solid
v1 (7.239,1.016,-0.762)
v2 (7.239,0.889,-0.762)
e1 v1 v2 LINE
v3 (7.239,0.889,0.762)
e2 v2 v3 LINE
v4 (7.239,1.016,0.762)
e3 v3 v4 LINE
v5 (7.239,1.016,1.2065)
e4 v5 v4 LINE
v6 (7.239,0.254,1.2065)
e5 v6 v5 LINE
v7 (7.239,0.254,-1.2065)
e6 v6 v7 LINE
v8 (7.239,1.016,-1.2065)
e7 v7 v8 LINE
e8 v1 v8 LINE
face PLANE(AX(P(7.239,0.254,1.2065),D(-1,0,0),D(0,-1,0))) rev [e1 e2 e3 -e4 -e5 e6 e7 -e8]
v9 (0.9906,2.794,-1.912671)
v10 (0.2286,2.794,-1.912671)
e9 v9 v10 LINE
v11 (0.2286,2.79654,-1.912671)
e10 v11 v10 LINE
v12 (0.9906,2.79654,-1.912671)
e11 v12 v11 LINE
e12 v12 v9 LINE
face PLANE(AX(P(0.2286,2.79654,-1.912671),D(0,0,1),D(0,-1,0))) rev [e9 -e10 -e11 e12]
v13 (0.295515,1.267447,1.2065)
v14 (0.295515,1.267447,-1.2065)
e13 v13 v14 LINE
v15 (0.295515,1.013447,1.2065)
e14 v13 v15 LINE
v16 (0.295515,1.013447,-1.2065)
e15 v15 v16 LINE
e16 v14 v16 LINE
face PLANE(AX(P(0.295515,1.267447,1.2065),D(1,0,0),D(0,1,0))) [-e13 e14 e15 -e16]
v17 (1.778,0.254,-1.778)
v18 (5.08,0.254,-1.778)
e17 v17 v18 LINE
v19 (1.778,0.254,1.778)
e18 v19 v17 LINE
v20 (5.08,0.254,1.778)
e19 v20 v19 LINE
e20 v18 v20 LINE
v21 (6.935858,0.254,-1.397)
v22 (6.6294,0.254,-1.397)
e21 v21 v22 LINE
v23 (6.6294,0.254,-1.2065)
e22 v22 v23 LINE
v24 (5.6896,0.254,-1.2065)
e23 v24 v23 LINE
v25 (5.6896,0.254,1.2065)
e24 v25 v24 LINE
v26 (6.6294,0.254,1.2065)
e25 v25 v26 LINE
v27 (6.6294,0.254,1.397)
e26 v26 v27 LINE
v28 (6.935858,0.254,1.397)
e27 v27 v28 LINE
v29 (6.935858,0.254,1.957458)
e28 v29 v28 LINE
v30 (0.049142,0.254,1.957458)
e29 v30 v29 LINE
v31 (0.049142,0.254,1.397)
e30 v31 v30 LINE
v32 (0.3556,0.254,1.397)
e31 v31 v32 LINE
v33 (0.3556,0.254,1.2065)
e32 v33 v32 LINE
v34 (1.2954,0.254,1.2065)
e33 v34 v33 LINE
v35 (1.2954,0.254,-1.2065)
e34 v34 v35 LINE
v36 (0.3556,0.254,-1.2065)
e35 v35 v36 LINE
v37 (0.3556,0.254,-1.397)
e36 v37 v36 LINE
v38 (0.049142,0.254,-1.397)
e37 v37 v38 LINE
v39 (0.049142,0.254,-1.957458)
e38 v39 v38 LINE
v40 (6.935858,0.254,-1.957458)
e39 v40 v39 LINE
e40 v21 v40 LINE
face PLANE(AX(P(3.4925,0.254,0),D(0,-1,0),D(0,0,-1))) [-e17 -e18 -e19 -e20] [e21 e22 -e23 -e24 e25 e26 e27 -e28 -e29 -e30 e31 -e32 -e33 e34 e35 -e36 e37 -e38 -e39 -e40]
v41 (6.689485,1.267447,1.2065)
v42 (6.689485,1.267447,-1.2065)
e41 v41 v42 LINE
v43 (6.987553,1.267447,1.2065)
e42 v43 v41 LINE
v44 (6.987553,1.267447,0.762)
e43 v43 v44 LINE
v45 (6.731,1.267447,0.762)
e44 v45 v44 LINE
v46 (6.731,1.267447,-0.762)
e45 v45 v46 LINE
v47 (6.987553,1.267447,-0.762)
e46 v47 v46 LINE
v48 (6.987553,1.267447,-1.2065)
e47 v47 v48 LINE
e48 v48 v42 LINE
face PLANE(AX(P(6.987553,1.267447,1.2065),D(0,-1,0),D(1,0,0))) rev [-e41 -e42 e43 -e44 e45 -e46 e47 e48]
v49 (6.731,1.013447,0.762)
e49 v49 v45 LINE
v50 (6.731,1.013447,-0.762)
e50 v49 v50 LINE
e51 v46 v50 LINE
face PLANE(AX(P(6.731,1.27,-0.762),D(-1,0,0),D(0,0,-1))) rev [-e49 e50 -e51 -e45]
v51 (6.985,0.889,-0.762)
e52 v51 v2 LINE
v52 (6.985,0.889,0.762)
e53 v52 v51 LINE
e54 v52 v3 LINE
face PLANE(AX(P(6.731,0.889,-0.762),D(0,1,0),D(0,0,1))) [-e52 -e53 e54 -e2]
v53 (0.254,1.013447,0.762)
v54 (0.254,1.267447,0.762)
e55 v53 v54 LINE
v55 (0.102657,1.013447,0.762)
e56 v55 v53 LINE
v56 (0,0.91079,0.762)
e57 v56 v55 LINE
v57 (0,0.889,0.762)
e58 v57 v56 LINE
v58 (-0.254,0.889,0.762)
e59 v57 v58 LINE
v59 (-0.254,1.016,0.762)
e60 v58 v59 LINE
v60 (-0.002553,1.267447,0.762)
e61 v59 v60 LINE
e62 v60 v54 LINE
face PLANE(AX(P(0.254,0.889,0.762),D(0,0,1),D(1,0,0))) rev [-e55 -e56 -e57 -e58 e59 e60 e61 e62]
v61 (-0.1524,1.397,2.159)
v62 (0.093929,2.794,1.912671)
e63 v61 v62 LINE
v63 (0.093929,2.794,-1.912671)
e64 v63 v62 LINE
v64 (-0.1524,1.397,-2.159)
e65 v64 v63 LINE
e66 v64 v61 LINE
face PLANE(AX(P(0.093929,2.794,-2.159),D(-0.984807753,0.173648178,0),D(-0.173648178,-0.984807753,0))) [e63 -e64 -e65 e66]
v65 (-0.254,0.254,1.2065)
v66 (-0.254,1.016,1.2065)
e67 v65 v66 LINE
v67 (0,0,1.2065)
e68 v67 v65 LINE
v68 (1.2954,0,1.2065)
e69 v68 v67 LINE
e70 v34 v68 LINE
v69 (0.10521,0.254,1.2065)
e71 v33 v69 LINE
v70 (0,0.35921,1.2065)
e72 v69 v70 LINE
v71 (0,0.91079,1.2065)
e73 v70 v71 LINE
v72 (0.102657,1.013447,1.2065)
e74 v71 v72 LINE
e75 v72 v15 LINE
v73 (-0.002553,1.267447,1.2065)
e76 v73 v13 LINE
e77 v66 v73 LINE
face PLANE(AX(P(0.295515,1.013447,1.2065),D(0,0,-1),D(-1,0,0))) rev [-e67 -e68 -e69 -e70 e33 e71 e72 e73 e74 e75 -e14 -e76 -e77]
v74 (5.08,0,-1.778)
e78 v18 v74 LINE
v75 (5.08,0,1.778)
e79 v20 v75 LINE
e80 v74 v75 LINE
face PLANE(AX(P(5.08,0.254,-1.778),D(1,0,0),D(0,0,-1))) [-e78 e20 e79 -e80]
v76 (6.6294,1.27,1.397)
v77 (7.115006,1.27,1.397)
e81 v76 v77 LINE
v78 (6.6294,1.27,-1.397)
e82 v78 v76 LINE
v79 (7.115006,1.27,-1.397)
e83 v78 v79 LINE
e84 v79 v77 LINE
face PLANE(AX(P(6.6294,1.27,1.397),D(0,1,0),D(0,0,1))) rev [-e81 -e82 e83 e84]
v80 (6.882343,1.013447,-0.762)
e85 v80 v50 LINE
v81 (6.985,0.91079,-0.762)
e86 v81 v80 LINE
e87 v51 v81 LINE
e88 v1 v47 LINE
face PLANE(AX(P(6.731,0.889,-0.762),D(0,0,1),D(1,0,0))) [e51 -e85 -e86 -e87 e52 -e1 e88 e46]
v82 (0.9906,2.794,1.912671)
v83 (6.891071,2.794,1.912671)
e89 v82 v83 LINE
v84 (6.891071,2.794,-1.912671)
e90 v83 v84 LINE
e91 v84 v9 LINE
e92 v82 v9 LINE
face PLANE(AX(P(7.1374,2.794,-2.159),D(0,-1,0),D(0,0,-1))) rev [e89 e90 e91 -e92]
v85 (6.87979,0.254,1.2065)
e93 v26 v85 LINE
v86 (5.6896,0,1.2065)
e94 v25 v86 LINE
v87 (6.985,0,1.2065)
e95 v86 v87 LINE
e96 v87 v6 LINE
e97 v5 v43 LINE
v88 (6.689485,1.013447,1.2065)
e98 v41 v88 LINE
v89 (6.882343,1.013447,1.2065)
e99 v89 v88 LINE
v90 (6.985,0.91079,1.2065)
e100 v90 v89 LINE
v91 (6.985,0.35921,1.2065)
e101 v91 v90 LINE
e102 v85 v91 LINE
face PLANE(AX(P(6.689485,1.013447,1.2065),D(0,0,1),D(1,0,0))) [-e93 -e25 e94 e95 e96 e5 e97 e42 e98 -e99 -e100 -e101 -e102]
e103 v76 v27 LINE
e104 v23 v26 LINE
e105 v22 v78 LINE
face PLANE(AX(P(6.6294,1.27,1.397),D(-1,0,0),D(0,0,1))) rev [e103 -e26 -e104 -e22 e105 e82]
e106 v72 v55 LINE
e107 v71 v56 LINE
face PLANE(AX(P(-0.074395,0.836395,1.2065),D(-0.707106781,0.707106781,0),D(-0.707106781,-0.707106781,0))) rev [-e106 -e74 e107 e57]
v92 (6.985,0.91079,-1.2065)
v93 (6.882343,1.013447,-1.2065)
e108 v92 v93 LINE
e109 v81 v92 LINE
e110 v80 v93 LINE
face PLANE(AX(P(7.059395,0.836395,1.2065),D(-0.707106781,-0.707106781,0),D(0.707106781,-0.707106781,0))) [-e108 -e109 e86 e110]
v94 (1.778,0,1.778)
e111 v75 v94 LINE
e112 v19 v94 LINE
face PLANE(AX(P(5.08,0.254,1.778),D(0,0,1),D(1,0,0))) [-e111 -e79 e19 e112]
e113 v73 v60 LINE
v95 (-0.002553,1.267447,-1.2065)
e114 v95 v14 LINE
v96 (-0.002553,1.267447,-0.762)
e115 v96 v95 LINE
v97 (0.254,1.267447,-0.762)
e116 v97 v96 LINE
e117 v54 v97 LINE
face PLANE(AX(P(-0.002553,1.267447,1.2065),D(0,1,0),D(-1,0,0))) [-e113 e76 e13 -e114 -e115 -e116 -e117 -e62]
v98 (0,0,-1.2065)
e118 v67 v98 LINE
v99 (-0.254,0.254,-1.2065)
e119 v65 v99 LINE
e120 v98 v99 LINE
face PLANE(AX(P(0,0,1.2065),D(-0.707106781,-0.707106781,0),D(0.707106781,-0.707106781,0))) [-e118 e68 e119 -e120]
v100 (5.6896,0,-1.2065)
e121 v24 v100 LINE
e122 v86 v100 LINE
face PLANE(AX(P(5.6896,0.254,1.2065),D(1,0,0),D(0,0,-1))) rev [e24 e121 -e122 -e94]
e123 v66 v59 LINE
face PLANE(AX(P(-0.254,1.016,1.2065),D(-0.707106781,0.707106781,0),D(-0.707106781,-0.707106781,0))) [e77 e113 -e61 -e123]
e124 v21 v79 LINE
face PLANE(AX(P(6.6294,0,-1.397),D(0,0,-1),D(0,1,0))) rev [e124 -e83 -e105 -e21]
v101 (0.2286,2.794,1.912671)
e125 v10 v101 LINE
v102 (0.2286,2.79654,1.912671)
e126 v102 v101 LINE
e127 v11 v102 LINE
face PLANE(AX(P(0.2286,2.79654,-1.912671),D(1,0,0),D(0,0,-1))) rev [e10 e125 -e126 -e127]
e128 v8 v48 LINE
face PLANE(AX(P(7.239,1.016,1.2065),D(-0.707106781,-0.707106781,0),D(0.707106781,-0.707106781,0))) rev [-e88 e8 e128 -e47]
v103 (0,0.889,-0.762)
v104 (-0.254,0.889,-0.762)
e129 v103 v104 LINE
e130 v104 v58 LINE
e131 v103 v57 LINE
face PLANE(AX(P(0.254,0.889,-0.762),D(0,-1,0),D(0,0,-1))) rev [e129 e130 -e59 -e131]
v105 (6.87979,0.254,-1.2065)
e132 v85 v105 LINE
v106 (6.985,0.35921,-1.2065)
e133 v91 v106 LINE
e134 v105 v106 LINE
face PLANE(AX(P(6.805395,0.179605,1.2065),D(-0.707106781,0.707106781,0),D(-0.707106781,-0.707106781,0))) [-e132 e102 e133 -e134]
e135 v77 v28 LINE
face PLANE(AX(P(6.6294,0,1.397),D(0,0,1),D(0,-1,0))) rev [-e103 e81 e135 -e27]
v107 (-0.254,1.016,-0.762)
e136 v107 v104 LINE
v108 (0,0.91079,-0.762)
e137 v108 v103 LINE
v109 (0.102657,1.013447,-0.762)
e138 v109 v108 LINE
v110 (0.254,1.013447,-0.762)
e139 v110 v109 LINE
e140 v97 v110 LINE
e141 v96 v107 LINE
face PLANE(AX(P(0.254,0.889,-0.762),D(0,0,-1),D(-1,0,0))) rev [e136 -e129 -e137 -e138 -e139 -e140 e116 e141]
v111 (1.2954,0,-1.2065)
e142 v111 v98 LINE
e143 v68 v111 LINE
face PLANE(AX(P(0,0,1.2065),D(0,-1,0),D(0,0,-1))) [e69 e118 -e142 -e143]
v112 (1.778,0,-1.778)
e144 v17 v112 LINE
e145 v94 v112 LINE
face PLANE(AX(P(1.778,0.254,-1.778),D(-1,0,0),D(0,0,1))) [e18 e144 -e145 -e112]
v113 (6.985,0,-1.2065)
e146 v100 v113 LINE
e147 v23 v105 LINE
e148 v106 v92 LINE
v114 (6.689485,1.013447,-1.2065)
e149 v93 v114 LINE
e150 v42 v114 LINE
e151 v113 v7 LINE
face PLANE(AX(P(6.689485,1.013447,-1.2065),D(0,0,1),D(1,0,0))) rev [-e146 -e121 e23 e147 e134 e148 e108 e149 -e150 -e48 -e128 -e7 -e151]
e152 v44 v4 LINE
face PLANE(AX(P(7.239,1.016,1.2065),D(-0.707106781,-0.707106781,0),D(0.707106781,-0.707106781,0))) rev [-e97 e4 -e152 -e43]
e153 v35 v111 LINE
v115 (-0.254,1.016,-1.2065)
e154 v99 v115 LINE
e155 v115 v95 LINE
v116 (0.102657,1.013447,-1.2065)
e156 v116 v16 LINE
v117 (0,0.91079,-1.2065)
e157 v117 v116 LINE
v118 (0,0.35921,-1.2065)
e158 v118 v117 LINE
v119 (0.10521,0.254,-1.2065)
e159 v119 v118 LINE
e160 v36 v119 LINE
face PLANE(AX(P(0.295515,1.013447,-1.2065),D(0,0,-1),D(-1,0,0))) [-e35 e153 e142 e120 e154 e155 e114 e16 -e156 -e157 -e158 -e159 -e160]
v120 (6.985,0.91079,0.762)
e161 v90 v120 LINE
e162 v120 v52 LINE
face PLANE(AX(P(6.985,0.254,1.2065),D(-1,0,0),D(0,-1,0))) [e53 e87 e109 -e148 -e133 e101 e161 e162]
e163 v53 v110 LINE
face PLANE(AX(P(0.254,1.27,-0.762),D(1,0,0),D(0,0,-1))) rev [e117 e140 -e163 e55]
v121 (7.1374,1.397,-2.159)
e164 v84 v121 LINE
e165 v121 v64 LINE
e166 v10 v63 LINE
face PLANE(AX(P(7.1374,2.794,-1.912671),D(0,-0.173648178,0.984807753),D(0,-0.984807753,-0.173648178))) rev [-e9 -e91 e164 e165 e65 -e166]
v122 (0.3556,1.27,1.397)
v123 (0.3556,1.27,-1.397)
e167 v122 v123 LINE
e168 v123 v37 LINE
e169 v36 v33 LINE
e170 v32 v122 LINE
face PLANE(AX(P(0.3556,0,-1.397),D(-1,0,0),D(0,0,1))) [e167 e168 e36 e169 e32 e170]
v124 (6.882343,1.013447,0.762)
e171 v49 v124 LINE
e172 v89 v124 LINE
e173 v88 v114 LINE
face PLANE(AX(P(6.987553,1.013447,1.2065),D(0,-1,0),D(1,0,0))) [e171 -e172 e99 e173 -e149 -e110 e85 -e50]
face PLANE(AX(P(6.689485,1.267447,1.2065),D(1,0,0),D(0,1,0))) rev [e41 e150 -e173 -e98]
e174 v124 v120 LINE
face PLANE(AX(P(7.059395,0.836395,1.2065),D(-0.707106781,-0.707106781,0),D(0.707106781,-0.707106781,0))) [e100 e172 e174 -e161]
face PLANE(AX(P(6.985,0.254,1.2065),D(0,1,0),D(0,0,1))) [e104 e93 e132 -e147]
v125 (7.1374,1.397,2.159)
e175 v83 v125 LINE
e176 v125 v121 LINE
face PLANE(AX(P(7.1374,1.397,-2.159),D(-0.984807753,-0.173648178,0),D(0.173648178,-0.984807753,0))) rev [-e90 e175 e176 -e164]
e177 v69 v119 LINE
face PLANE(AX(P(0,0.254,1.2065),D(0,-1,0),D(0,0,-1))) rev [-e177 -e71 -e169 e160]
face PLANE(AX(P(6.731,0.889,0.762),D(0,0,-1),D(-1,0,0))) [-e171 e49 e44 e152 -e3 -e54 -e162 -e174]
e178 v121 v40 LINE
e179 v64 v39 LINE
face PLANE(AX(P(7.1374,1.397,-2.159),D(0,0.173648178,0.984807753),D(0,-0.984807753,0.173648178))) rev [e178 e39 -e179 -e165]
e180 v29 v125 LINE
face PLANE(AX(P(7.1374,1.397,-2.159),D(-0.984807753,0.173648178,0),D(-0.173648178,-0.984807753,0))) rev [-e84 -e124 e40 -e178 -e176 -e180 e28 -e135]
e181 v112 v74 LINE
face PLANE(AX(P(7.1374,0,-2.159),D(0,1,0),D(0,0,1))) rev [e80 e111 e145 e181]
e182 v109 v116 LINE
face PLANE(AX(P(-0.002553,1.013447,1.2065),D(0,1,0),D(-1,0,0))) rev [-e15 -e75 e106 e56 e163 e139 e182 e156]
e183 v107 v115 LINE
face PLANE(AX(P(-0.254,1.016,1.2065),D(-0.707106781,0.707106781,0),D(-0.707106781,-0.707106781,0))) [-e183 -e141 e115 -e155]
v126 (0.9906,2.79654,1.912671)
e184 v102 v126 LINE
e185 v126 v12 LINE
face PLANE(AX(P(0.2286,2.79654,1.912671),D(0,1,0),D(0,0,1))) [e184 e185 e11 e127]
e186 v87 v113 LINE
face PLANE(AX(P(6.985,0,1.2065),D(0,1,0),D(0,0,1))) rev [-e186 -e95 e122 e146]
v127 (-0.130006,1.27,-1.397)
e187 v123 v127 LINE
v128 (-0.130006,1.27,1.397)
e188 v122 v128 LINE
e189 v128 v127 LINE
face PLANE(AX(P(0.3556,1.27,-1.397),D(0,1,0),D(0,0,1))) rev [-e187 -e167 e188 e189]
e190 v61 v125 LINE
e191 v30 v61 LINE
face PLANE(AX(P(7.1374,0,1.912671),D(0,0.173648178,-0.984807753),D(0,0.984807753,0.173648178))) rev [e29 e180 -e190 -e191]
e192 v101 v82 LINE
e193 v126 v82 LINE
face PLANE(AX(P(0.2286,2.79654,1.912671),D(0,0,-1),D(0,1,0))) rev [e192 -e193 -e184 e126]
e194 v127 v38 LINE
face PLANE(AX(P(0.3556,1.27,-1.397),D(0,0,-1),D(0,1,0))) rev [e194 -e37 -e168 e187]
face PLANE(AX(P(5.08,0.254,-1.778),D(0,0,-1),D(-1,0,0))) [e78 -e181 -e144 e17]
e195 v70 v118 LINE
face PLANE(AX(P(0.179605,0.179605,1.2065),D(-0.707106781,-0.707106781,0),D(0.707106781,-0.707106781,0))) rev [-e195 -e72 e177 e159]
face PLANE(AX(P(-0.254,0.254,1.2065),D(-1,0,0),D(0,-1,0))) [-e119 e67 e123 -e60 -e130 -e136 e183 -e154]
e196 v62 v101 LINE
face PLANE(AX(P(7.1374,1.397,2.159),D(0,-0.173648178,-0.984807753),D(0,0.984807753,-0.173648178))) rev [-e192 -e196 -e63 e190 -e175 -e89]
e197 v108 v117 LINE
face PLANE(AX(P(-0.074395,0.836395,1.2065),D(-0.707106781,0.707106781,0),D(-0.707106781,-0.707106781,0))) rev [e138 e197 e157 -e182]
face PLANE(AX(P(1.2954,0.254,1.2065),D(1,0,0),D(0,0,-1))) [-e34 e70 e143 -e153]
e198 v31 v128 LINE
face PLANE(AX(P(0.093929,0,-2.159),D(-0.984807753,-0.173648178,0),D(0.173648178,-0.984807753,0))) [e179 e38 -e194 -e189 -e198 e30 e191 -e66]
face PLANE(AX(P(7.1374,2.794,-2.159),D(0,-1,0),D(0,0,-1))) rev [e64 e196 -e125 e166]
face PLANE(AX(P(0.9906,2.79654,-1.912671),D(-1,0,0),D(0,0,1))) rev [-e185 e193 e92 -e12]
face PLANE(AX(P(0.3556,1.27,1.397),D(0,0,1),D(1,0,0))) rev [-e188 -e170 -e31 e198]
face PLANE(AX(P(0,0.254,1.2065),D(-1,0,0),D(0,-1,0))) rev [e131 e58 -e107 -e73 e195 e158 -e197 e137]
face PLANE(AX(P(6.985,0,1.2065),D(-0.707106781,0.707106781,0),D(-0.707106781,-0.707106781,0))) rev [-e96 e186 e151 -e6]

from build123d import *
from OCP.BRepFilletAPI import BRepFilletAPI_MakeChamfer

# Parameters (mm, degrees)
SKETCH2_W                = 4.318
SKETCH2_H                = 2.794
BASE_EXTRUDE_DEPTH       = 7.2898
CHAMFER1_SIZE            = 1.397
CHAMFER1_SIZE2           = 0.246328792
SKETCH3_W                = 2.794
SKETCH3_H                = 1.27
CUT_EXTRUDE1_DEPTH       = 0.508
SKETCH4_W                = 2.794
SKETCH4_H                = 1.27
CUT_EXTRUDE2_DEPTH       = 0.508
SKETCH5_OUTSIDE_W        = 11.073
SKETCH5_OUTSIDE_H        = 8.102
SKETCH5_OUTSIDE_W_2      = 3.302
SKETCH5_OUTSIDE_H_2      = 3.556
CUT_EXTRUDE3_DEPTH       = 0.254
CHAMFER2_SIZE            = 1.397
CHAMFER2_SIZE_2          = 0.246328792
BOSS_EXTRUDE_THIN1_DEPTH = 1.2065
SKETCH7_W                = 1.524
SKETCH7_H                = 0.381
CUT_EXTRUDE4_DEPTH       = 0.508
SKETCH8_W                = 0.762
SKETCH8_H                = 3.825342416
BOSS_EXTRUDE2_DEPTH      = 0.00254


with BuildPart() as part:
    # Sketch2 → Base-Extrude (new body)
    with BuildSketch(Plane(origin=(-0.1524, 0, 0), x_dir=(0, 0, -1), z_dir=(1, 0, 0))):
        with Locations((0, 1.397)):
            Rectangle(SKETCH2_W, SKETCH2_H)
    extrude(amount=BASE_EXTRUDE_DEPTH)

    # Chamfer1: one chamfer whose edges measure the first distance from different faces: ONE call of the kernel's chamfer builder (chamfer() names one face for all edges)
    chamfer1_edges_1 = [part.edges().sort_by_distance(p)[0] for p in [
        (7.1374, 0, 0),
    ]]
    chamfer1_side_1 = [part.faces().sort_by_distance(p)[0] for p in [
        (7.1374, 1.397, 0),
    ]]
    chamfer1_edges_2 = [part.edges().sort_by_distance(p)[0] for p in [
        (-0.1524, 0, 0),
    ]]
    chamfer1_side_2 = [part.faces().sort_by_distance(p)[0] for p in [
        (-0.1524, 1.397, 0),
    ]]
    chamfer1_edges_3 = [part.edges().sort_by_distance(p)[0] for p in [
        (3.4925, 0, -2.159),
    ]]
    chamfer1_side_3 = [part.faces().sort_by_distance(p)[0] for p in [
        (3.4925, 1.397, -2.159),
    ]]
    chamfer1_edges_4 = [part.edges().sort_by_distance(p)[0] for p in [
        (3.4925, 0, 2.159),
    ]]
    chamfer1_side_4 = [part.faces().sort_by_distance(p)[0] for p in [
        (3.4925, 1.397, 2.159),
    ]]
    chamfer1 = BRepFilletAPI_MakeChamfer(part.part.solid().wrapped)
    for e in chamfer1_edges_1:
        chamfer1.Add(CHAMFER1_SIZE, CHAMFER1_SIZE2, e.wrapped, chamfer1_side_1[0].wrapped)  # the first distance lies on this face
    for e in chamfer1_edges_2:
        chamfer1.Add(CHAMFER1_SIZE, CHAMFER1_SIZE2, e.wrapped, chamfer1_side_2[0].wrapped)  # the first distance lies on this face
    for e in chamfer1_edges_3:
        chamfer1.Add(CHAMFER1_SIZE, CHAMFER1_SIZE2, e.wrapped, chamfer1_side_3[0].wrapped)  # the first distance lies on this face
    for e in chamfer1_edges_4:
        chamfer1.Add(CHAMFER1_SIZE, CHAMFER1_SIZE2, e.wrapped, chamfer1_side_4[0].wrapped)  # the first distance lies on this face
    add(Compound.cast(chamfer1.Shape()), mode=Mode.REPLACE)

    # Sketch3 → Cut-Extrude1 (cut)
    with BuildSketch(Plane.ZY.offset(0.1524)):
        with Locations((0, 0.635)):
            Rectangle(SKETCH3_W, SKETCH3_H)
    extrude(amount=-CUT_EXTRUDE1_DEPTH, mode=Mode.SUBTRACT)

    # Sketch4 → Cut-Extrude2 (cut)
    with BuildSketch(Plane(origin=(7.1374, 0, 0), x_dir=(0, 0, -1), z_dir=(1, 0, 0))):
        with Locations((0, 0.635)):
            Rectangle(SKETCH4_W, SKETCH4_H)
    extrude(amount=-CUT_EXTRUDE2_DEPTH, mode=Mode.SUBTRACT)

    # Sketch5 outside → Cut-Extrude3 (cut)
    with BuildSketch(Plane.XZ):
        with Locations((3.4925, 0)):
            Rectangle(SKETCH5_OUTSIDE_W, SKETCH5_OUTSIDE_H)
        with Locations((3.429, 0)):
            Rectangle(SKETCH5_OUTSIDE_W_2, SKETCH5_OUTSIDE_H_2, mode=Mode.SUBTRACT)
    extrude(amount=-CUT_EXTRUDE3_DEPTH, mode=Mode.SUBTRACT)

    # Chamfer2
    chamfer2_edges_1 = [part.edges().sort_by_distance(p)[0] for p in [
        (-0.1524, 2.794, 0),
    ]]
    chamfer2_side_1 = [part.faces().sort_by_distance(p)[0] for p in [
        (-0.1524, 2.789073424, 0),
    ]]
    chamfer2_edges_2 = [part.edges().sort_by_distance(p)[0] for p in [
        (7.1374, 2.794, 0),
    ]]
    chamfer2_side_2 = [part.faces().sort_by_distance(p)[0] for p in [
        (7.132473424, 2.794, 0),
    ]]
    chamfer2_edges_3 = [part.edges().sort_by_distance(p)[0] for p in [
        (3.4925, 2.794, 2.159),
    ]]
    chamfer2_side_3 = [part.faces().sort_by_distance(p)[0] for p in [
        (3.4925, 2.789073424, 2.159),
    ]]
    chamfer2_edges_4 = [part.edges().sort_by_distance(p)[0] for p in [
        (3.4925, 2.794, -2.159),
    ]]
    chamfer2_side_4 = [part.faces().sort_by_distance(p)[0] for p in [
        (3.4925, 2.794, -2.154073424),
    ]]
    chamfer2 = BRepFilletAPI_MakeChamfer(part.part.solid().wrapped)
    for e in chamfer2_edges_1:
        chamfer2.Add(CHAMFER2_SIZE - 0.0001, CHAMFER2_SIZE_2 - 0.0001, e.wrapped, chamfer2_side_1[0].wrapped)
    for e in chamfer2_edges_2:
        chamfer2.Add(CHAMFER2_SIZE_2 - 0.0001, CHAMFER2_SIZE - 0.0001, e.wrapped, chamfer2_side_2[0].wrapped)
    for e in chamfer2_edges_3:
        chamfer2.Add(CHAMFER2_SIZE - 0.0001, CHAMFER2_SIZE_2 - 0.0001, e.wrapped, chamfer2_side_3[0].wrapped)
    for e in chamfer2_edges_4:
        chamfer2.Add(CHAMFER2_SIZE_2 - 0.0001, CHAMFER2_SIZE - 0.0001, e.wrapped, chamfer2_side_4[0].wrapped)
    add(Compound.cast(chamfer2.Shape()), mode=Mode.REPLACE)  # a hair under: the kernel refuses the full size

    # Sketch6 → Boss-Extrude-Thin1 (add, symmetric)
    with BuildSketch(Plane.XY):
        Polygon((0.295515086, 1.267447171), (-0.002552829, 1.267447171), (-0.254, 1.016), (-0.254, 0.254), (0, 0), (1.2954, 0), (1.2954, 0.254), (0.105210245, 0.254), (0, 0.359210245), (0, 0.910789755), (0.102657416, 1.013447171), (0.295515086, 1.013447171), align=None)
    boss_extrude_thin1 = extrude(amount=BOSS_EXTRUDE_THIN1_DEPTH, both=True)

    # Sketch7 → Cut-Extrude4 (cut)
    with BuildSketch(Plane.ZY.offset(0.254)):
        with Locations((0, 1.0795)):
            Rectangle(SKETCH7_W, SKETCH7_H)
    cut_extrude4 = extrude(amount=-CUT_EXTRUDE4_DEPTH, mode=Mode.SUBTRACT)

    # Mirror1: Boss-Extrude-Thin1, Cut-Extrude4 across plane
    add(boss_extrude_thin1.mirror(Plane(origin=(3.4925, 0, 0), x_dir=(0, 0, 1), z_dir=(1, 0, 0))))
    add(cut_extrude4.mirror(Plane(origin=(3.4925, 0, 0), x_dir=(0, 0, 1), z_dir=(1, 0, 0))), mode=Mode.SUBTRACT)

    # Sketch8 → Boss-Extrude2 (add)
    with BuildSketch(Plane(origin=(0, 2.794, 0), x_dir=(-1, 0, 0), z_dir=(0, 1, 0))):
        with Locations((-0.6096, 0)):
            Rectangle(SKETCH8_W, SKETCH8_H)
    extrude(amount=BOSS_EXTRUDE2_DEPTH)


solid = part.part
